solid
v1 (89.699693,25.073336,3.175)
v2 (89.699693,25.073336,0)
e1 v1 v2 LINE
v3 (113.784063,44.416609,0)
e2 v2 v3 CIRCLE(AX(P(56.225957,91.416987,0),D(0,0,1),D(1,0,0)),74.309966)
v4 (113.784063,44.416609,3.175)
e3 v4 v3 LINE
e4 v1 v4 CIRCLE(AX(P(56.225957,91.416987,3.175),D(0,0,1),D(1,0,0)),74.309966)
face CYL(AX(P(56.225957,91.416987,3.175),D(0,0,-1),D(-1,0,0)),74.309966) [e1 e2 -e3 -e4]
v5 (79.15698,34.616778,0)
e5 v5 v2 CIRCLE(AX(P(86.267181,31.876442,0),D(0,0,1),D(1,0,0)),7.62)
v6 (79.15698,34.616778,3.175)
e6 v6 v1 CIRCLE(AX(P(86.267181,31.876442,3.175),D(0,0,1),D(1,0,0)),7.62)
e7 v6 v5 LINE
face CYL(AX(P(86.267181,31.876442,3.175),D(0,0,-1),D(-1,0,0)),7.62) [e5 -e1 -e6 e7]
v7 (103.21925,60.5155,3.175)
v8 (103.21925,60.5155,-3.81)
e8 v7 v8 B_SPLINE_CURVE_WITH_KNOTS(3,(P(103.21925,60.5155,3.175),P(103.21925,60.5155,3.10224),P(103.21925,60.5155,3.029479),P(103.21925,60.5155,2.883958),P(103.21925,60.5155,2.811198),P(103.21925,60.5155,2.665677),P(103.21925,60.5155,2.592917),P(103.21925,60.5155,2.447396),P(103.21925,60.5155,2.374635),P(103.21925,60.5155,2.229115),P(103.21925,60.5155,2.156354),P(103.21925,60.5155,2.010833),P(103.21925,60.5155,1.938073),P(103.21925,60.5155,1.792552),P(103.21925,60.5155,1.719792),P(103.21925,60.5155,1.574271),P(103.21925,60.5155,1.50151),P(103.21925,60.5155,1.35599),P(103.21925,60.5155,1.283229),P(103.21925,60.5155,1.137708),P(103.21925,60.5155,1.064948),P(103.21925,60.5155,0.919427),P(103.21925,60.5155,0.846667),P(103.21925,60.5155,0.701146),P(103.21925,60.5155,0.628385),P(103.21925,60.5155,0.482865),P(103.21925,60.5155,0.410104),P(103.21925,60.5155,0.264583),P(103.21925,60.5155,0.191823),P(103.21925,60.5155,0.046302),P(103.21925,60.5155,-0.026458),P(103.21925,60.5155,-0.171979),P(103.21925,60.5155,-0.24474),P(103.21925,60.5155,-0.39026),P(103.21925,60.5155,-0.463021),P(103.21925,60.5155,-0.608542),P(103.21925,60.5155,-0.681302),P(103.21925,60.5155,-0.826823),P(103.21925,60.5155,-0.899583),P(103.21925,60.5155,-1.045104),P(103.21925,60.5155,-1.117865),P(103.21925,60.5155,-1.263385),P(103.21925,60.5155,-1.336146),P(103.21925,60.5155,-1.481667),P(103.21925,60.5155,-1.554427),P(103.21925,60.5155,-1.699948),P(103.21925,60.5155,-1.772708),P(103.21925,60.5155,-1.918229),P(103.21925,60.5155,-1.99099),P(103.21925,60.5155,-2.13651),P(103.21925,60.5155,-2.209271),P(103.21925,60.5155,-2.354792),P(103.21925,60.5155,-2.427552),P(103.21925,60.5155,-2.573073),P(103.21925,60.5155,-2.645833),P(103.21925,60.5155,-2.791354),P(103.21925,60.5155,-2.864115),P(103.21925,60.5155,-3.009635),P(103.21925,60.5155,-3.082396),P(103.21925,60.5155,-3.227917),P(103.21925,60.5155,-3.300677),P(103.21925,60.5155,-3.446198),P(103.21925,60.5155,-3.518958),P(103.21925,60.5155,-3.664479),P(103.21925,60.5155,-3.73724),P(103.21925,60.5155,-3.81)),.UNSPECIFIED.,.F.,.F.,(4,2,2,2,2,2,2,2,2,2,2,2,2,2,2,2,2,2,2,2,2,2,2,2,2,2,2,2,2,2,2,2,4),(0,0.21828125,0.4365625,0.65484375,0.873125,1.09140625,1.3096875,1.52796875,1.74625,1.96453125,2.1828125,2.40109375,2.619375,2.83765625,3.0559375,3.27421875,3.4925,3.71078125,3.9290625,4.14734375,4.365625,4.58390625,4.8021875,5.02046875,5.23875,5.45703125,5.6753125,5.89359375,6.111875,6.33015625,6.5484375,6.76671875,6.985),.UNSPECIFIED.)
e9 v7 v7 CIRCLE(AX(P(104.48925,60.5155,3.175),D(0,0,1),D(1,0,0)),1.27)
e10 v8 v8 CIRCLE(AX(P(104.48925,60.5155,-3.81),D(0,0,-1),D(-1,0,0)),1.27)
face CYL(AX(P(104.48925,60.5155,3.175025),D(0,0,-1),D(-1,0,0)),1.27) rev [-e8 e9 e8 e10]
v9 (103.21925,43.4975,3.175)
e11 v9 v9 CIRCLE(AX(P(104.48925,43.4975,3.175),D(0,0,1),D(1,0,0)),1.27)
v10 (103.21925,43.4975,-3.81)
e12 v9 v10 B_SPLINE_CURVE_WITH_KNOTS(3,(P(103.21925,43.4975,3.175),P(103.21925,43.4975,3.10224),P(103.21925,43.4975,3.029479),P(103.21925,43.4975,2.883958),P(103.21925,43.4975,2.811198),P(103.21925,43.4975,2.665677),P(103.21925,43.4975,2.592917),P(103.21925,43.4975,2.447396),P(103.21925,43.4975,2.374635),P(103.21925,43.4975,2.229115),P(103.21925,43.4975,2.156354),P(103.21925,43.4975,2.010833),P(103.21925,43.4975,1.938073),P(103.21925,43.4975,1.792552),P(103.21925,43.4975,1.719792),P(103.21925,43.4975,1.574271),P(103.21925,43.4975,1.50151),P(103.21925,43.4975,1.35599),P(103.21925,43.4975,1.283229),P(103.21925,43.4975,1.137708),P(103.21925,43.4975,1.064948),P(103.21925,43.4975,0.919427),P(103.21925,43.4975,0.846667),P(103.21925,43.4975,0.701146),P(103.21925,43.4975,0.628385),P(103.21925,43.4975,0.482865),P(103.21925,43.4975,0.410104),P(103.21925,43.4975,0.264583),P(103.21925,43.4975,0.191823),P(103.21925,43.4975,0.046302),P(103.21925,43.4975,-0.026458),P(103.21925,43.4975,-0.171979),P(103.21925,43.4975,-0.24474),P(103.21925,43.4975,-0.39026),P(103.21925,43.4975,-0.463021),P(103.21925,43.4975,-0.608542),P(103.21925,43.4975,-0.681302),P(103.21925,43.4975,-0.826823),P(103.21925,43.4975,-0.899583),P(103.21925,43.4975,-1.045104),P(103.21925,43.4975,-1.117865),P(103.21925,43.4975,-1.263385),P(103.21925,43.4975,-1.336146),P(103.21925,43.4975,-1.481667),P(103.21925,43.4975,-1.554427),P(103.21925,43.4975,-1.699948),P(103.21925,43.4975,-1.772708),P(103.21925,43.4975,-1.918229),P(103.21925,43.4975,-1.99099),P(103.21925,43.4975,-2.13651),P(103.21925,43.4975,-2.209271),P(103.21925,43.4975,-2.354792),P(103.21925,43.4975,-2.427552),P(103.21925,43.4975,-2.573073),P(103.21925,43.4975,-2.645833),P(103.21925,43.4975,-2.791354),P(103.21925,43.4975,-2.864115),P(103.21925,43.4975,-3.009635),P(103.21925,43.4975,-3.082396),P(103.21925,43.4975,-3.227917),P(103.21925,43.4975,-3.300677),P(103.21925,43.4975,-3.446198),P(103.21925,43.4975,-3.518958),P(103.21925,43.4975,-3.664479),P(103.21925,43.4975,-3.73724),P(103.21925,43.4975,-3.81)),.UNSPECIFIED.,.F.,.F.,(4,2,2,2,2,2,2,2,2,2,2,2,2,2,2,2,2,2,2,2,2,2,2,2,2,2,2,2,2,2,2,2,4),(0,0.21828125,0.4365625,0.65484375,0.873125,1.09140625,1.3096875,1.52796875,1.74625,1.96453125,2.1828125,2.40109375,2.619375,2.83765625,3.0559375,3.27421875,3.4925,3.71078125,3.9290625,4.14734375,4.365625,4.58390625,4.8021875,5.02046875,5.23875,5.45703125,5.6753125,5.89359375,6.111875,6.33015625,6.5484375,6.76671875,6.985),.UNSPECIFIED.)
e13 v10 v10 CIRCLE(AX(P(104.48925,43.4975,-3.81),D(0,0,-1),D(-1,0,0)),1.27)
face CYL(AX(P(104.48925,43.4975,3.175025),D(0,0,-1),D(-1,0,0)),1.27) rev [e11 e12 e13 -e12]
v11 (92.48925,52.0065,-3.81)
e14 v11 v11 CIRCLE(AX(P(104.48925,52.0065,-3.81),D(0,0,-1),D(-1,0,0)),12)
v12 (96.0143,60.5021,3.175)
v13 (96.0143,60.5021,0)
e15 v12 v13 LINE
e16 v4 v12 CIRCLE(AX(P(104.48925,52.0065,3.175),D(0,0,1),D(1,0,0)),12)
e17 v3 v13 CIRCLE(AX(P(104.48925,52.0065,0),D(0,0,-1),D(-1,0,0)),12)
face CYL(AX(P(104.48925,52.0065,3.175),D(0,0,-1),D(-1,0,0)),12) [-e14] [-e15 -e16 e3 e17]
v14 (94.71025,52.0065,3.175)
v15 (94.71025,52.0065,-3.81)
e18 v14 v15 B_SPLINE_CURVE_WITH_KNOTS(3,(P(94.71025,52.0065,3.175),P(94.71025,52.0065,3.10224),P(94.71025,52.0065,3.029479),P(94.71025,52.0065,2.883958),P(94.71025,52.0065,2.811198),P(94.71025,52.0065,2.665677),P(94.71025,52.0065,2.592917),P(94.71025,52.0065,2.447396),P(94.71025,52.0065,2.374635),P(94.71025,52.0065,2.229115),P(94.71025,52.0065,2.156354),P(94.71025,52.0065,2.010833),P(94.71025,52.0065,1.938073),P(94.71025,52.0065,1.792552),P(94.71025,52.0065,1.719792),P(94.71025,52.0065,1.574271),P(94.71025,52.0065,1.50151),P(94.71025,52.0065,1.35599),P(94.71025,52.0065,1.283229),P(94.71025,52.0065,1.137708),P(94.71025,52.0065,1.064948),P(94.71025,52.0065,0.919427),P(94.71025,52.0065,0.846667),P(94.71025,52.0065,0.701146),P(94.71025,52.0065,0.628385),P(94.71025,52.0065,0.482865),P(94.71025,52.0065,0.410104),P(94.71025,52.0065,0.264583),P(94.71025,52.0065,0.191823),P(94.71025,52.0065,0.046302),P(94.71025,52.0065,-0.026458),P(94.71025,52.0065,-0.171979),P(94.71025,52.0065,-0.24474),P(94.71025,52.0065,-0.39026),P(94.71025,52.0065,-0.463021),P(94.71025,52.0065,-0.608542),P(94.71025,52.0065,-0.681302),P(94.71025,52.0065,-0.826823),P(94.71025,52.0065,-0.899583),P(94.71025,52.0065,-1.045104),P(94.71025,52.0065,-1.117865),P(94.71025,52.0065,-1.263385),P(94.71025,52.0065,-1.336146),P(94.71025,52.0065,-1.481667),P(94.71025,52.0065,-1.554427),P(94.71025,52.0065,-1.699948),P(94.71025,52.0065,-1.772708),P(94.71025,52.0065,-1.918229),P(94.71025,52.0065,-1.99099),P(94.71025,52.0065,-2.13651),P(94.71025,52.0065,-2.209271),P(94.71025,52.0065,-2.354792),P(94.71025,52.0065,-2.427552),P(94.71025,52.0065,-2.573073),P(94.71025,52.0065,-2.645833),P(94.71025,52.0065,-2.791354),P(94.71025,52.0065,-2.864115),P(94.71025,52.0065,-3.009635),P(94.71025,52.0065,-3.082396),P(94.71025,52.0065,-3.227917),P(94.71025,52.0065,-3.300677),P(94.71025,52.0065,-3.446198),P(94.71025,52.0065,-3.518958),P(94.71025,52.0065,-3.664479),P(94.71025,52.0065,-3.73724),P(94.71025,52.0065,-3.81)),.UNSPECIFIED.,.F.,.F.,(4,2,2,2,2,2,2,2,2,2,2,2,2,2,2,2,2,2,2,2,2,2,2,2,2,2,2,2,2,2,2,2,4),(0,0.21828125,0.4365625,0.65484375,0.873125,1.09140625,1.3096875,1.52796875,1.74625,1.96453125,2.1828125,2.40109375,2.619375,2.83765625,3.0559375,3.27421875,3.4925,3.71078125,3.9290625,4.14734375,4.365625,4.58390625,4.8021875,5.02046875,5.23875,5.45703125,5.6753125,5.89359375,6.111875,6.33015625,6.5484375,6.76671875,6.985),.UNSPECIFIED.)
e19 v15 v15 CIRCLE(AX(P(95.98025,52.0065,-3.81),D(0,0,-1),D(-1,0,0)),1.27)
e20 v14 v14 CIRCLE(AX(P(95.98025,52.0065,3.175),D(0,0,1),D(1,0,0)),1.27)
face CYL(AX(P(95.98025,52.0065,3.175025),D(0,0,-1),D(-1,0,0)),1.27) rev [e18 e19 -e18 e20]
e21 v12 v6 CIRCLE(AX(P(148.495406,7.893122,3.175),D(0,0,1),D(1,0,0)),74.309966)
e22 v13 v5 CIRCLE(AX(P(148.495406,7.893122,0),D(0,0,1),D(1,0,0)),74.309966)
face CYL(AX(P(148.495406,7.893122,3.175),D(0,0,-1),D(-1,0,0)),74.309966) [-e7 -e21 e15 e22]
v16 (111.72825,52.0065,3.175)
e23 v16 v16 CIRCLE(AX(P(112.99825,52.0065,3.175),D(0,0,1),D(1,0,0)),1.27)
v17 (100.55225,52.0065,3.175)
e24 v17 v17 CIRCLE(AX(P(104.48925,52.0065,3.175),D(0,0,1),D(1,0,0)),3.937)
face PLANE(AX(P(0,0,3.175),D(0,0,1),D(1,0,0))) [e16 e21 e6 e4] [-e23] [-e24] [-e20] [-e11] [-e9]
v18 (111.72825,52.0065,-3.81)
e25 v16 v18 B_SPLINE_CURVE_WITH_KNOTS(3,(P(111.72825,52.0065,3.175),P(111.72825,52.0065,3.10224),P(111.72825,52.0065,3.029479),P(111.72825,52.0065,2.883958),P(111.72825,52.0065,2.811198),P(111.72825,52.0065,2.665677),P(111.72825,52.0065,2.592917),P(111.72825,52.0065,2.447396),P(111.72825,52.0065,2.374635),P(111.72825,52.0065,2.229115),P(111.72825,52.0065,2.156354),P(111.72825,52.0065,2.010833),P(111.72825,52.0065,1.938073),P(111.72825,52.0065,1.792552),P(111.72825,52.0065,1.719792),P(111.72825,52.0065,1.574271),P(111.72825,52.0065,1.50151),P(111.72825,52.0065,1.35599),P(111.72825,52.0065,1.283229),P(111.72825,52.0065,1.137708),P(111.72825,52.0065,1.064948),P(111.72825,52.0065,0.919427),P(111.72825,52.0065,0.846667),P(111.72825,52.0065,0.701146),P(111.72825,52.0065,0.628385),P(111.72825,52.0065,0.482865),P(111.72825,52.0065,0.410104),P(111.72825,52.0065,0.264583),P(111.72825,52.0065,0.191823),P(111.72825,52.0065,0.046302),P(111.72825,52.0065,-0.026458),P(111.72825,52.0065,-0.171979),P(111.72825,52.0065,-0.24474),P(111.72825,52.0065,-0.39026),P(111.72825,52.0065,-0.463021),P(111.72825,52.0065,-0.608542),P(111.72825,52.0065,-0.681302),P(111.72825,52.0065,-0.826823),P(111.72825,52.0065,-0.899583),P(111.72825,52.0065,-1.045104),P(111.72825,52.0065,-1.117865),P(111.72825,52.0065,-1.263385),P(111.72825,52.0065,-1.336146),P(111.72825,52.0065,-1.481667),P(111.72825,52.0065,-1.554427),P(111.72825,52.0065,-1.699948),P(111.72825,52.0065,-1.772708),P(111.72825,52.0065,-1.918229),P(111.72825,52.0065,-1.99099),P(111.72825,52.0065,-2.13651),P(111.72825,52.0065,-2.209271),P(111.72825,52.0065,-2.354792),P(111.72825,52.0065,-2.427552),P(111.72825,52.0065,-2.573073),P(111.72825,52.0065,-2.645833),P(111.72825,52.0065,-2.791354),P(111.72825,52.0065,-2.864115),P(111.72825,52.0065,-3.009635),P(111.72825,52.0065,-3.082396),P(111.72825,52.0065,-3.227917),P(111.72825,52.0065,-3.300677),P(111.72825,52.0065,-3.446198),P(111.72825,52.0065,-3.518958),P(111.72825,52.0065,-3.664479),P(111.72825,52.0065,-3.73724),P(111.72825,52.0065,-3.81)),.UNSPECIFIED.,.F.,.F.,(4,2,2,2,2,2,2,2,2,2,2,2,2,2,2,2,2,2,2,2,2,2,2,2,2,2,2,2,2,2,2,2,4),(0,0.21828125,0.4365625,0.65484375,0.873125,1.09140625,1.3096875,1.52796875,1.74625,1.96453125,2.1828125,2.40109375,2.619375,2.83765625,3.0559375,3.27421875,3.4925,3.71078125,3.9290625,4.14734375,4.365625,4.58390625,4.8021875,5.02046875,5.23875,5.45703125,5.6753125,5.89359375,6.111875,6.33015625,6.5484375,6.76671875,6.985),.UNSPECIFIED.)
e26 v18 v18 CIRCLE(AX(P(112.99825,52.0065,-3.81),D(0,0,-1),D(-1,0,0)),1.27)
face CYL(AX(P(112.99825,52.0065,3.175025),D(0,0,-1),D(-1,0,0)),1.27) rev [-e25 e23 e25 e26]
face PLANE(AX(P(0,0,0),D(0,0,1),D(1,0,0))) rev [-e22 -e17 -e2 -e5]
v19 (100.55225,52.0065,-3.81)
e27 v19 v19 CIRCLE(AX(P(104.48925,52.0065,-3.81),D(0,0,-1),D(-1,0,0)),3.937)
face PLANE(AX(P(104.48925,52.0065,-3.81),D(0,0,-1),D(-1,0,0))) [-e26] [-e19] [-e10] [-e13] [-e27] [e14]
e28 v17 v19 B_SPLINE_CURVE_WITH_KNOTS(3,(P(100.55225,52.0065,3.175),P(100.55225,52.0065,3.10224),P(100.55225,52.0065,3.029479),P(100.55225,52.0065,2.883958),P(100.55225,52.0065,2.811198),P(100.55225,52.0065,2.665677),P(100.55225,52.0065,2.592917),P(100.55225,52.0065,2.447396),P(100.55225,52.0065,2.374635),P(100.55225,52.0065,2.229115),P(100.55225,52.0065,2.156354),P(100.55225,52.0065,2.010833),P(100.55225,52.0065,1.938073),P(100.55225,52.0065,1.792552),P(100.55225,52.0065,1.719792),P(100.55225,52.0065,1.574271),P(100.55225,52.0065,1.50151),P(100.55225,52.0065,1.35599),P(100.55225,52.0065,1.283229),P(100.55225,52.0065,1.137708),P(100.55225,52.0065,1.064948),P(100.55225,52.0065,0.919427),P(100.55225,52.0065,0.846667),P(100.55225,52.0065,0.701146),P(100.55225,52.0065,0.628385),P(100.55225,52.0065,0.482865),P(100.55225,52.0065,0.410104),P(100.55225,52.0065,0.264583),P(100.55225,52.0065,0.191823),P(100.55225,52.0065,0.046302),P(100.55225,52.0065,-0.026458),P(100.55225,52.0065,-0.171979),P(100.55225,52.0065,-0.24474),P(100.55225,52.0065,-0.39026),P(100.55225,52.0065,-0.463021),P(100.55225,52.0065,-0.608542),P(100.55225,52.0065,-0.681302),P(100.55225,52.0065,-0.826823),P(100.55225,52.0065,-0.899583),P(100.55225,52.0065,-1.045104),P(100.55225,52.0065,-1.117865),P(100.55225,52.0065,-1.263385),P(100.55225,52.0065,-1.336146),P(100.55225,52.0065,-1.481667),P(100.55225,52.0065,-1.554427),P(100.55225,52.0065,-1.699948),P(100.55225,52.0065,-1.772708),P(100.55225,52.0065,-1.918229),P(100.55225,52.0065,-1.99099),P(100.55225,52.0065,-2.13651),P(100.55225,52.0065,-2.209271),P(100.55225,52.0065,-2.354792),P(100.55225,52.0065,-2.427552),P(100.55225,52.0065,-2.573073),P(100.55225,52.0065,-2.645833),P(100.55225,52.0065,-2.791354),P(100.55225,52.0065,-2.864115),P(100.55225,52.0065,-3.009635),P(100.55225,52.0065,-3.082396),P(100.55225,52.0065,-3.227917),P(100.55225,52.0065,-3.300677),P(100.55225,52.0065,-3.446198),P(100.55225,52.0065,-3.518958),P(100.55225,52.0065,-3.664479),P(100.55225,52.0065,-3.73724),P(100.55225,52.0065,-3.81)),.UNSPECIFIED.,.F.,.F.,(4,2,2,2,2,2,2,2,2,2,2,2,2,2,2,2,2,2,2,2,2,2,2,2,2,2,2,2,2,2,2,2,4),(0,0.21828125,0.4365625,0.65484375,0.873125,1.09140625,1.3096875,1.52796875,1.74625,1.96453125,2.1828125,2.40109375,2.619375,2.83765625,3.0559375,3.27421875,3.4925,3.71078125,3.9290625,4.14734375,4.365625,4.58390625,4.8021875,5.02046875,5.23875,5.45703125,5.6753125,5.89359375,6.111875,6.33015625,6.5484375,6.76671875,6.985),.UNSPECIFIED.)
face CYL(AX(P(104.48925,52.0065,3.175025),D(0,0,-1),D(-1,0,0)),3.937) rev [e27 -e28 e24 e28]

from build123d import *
from build123d.topology import SkipClean

# Parameters (mm, degrees)
BOSS_EXTRUDE1_DEPTH = 3.175
BOSS_EXTRUDE2_START = 3.81
SKETCH2_R           = 12
BOSS_EXTRUDE2_DEPTH = 3.81
SKETCH3_R           = 3.937
CUT_EXTRUDE1_DEPTH  = 134.099089527
SKETCH4_R           = 1.27
CUT_EXTRUDE2_DEPTH  = 134.099089527


with BuildPart() as part:
    # Sketch1 → Boss-Extrude1 (new body)
    with BuildSketch(Plane.XY):
        with BuildLine():
            ThreePointArc((113.784062988, 44.416608597), (112.542436022, 60.902914722), (96.014300162, 60.502100346))
            ThreePointArc((96.014300162, 60.502100346), (86.225733854, 48.445051897), (79.156979953, 34.616777747))
            ThreePointArc((79.156979953, 34.616777747), (81.153408489, 26.227218543), (89.699693339, 25.073335615))
            ThreePointArc((89.699693339, 25.073335615), (102.758092485, 33.479680479), (113.784062988, 44.416608597))
        make_face()
    extrude(amount=BOSS_EXTRUDE1_DEPTH)

    # Sketch2 → Boss-Extrude2 (add)
    with SkipClean():  # the faces are left unmerged after this step: merging them gives an invalid solid
        with BuildSketch(Plane(origin=(0, 0, 0), x_dir=(-1, 0, 0), z_dir=(0, 0, -1)).offset(BOSS_EXTRUDE2_START)):
            with Locations((-104.48925, 52.0065)):
                Circle(SKETCH2_R)
        extrude(amount=-BOSS_EXTRUDE2_DEPTH)

    # Sketch3 → Cut-Extrude1 (cut, through all)
    with SkipClean():  # the faces are left unmerged after this step: merging them gives an invalid solid
        with BuildSketch(Plane(origin=(0, 0, -3.81), x_dir=(-1, 0, 0), z_dir=(0, 0, -1))):
            with Locations((-104.48925, 52.0065)):
                Circle(SKETCH3_R)
        extrude(amount=-CUT_EXTRUDE1_DEPTH, mode=Mode.SUBTRACT)

    # Sketch4 → Cut-Extrude2 (cut, through all)
    with SkipClean():  # the faces are left unmerged after this step: merging them gives an invalid solid
        with BuildSketch(Plane(origin=(0, 0, -3.81), x_dir=(-1, 0, 0), z_dir=(0, 0, -1))):
            with Locations((-95.98025, 52.0065)):
                Circle(SKETCH4_R)
            with Locations((-112.99825, 52.0065)):
                Circle(SKETCH4_R)
            with Locations((-104.48925, 43.4975)):
                Circle(SKETCH4_R)
            with Locations((-104.48925, 60.5155)):
                Circle(SKETCH4_R)
        extrude(amount=-CUT_EXTRUDE2_DEPTH, mode=Mode.SUBTRACT)


solid = part.part
